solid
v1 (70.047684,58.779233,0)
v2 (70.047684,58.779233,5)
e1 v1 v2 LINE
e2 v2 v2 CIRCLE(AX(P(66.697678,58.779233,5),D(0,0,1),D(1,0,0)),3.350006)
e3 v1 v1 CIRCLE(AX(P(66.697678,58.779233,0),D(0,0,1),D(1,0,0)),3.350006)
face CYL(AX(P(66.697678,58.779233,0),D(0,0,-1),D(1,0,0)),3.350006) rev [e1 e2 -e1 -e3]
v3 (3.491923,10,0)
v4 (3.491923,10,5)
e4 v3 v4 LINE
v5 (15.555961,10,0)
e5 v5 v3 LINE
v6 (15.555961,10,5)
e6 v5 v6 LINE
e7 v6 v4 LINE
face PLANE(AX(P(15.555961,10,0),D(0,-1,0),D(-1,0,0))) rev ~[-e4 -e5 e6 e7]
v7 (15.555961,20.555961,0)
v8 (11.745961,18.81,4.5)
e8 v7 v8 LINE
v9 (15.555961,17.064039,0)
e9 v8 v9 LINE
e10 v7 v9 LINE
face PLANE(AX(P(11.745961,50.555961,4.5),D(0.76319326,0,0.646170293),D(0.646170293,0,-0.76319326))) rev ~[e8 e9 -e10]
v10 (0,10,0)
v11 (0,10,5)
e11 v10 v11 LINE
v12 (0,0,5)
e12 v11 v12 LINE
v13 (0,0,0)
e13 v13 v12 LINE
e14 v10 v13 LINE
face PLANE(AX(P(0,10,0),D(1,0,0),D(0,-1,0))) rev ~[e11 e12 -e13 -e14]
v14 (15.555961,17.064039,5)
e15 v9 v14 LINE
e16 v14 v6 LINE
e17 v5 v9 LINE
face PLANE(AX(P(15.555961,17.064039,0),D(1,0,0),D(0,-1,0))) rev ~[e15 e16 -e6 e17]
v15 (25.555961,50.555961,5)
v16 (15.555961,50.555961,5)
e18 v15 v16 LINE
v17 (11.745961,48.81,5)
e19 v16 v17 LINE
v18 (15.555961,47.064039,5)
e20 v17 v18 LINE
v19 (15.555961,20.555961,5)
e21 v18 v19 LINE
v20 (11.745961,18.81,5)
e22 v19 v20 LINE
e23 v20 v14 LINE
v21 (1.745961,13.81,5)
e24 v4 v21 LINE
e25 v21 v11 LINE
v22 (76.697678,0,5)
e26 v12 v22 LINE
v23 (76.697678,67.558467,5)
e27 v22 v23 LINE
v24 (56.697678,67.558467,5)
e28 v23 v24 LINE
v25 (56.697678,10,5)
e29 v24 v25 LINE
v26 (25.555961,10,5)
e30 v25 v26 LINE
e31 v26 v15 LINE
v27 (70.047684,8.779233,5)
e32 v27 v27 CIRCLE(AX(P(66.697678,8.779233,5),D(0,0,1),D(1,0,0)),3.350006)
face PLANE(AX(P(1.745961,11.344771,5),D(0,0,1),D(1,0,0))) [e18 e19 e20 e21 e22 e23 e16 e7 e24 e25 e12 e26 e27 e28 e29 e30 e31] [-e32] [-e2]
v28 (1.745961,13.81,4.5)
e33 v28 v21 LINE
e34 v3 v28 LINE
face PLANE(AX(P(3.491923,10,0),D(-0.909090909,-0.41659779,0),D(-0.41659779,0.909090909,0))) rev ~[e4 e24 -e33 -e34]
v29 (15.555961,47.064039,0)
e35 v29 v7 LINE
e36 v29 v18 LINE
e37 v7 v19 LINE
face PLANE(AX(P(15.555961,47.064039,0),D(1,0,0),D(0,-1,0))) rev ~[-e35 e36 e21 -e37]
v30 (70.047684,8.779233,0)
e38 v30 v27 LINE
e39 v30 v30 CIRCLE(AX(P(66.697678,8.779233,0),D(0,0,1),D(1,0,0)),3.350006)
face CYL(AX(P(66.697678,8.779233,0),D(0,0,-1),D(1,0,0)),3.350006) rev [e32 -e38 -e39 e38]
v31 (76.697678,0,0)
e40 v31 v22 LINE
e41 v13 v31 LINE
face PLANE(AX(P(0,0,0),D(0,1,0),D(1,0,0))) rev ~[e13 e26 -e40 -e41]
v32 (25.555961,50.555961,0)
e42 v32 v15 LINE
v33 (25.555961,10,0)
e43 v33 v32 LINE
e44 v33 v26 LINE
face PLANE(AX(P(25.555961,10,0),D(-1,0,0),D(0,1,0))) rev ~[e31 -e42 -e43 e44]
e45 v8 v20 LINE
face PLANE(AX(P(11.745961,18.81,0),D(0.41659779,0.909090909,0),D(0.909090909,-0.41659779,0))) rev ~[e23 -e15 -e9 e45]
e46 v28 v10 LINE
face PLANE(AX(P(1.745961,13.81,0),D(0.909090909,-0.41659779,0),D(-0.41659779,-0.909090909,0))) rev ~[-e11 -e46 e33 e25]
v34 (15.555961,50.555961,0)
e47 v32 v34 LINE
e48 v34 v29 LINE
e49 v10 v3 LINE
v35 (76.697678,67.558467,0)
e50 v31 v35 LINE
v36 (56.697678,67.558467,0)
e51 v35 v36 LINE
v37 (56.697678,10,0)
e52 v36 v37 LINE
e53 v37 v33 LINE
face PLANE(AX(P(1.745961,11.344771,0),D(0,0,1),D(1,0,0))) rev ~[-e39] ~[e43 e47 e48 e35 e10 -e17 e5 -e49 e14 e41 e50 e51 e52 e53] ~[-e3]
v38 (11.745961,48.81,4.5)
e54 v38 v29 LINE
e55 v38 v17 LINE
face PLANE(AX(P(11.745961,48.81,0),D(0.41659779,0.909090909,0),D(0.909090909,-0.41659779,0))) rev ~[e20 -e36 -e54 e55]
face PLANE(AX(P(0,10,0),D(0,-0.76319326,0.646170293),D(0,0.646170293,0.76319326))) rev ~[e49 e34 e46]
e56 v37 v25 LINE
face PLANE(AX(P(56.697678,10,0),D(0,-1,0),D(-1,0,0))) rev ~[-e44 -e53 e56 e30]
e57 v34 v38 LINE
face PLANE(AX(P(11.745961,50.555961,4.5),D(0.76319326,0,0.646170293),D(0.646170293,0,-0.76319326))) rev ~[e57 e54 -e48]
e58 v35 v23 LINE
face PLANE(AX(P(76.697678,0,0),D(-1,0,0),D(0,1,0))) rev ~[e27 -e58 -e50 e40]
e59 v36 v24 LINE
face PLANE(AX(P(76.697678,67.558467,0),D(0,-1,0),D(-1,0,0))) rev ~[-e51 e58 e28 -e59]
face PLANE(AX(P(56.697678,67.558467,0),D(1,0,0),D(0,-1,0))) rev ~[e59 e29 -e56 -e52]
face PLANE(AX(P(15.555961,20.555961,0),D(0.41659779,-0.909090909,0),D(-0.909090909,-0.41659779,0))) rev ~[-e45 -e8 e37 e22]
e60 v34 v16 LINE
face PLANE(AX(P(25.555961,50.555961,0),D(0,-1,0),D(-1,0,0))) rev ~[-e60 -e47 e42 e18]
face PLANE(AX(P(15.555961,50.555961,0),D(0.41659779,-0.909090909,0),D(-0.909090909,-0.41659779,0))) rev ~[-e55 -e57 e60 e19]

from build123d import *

# Parameters (mm, degrees)
F0_R     = 3.350006
F1_DEPTH = 5
F3_DEPTH = 40.5559613398
F5_DEPTH = 15.5559613398


# Not quite as in the source:
# - a feature names something its author has since deleted; it is built from what else it names


with BuildPart() as f1:
    # F0 (on Top) → F1 (new body)
    with BuildSketch(Plane.XY):
        Polygon((0, 10), (3.4919226796, 10), (1.7459613398, 13.81), align=None)
        Polygon((15.5559613398, 18.81), (15.5559613398, 20.5559613398), (11.7459613398, 18.81), align=None)
        Polygon((15.5559613398, 47.0640386602), (15.5559613398, 50.5559613398), (11.7459613398, 48.81), align=None)
        Polygon((25.5559613398, 50.5559613398), (15.5559613398, 50.5559613398), (15.5559613398, 47.0640386602), (15.5559613398, 20.5559613398), (15.5559613398, 18.81), (15.5559613398, 17.0640386602), (15.5559613398, 10), (3.4919226796, 10), (0, 10), (0, 0), (76.6976781032, 0), (76.6976781032, 67.5584669805), (56.6976781032, 67.5584669805), (56.6976781032, 10), (25.5559613398, 10), align=None)
        with Locations((66.6976781032, 8.7792334903)):
            Circle(F0_R, mode=Mode.SUBTRACT)
        with Locations((66.6976781032, 58.7792334903)):
            Circle(F0_R, mode=Mode.SUBTRACT)
        Polygon((15.5559613398, 17.0640386602), (15.5559613398, 18.81), (11.7459613398, 18.81), align=None)
    extrude(amount=F1_DEPTH)

    # F2 (on face) → F3 (cut, through all)
    with BuildSketch(Plane(origin=(0, 50.5559613398, 0), x_dir=(-1, 0, 0), z_dir=(0, 1, 0))):
        Polygon((-11.7459613398, 4.5), (-15.5559613398, 0), (-11.7459613398, 0), align=None)
    extrude(amount=-F3_DEPTH, mode=Mode.SUBTRACT)

    # F4 (on face) → F5 (cut, through all)
    with BuildSketch(Plane(origin=(0, 0, 0), x_dir=(0, -1, 0), z_dir=(-1, 0, 0))):
        Polygon((-13.81, 0), (-10, 0), (-13.81, 4.5), align=None)
    extrude(amount=-F5_DEPTH, mode=Mode.SUBTRACT)


solid = f1.part
